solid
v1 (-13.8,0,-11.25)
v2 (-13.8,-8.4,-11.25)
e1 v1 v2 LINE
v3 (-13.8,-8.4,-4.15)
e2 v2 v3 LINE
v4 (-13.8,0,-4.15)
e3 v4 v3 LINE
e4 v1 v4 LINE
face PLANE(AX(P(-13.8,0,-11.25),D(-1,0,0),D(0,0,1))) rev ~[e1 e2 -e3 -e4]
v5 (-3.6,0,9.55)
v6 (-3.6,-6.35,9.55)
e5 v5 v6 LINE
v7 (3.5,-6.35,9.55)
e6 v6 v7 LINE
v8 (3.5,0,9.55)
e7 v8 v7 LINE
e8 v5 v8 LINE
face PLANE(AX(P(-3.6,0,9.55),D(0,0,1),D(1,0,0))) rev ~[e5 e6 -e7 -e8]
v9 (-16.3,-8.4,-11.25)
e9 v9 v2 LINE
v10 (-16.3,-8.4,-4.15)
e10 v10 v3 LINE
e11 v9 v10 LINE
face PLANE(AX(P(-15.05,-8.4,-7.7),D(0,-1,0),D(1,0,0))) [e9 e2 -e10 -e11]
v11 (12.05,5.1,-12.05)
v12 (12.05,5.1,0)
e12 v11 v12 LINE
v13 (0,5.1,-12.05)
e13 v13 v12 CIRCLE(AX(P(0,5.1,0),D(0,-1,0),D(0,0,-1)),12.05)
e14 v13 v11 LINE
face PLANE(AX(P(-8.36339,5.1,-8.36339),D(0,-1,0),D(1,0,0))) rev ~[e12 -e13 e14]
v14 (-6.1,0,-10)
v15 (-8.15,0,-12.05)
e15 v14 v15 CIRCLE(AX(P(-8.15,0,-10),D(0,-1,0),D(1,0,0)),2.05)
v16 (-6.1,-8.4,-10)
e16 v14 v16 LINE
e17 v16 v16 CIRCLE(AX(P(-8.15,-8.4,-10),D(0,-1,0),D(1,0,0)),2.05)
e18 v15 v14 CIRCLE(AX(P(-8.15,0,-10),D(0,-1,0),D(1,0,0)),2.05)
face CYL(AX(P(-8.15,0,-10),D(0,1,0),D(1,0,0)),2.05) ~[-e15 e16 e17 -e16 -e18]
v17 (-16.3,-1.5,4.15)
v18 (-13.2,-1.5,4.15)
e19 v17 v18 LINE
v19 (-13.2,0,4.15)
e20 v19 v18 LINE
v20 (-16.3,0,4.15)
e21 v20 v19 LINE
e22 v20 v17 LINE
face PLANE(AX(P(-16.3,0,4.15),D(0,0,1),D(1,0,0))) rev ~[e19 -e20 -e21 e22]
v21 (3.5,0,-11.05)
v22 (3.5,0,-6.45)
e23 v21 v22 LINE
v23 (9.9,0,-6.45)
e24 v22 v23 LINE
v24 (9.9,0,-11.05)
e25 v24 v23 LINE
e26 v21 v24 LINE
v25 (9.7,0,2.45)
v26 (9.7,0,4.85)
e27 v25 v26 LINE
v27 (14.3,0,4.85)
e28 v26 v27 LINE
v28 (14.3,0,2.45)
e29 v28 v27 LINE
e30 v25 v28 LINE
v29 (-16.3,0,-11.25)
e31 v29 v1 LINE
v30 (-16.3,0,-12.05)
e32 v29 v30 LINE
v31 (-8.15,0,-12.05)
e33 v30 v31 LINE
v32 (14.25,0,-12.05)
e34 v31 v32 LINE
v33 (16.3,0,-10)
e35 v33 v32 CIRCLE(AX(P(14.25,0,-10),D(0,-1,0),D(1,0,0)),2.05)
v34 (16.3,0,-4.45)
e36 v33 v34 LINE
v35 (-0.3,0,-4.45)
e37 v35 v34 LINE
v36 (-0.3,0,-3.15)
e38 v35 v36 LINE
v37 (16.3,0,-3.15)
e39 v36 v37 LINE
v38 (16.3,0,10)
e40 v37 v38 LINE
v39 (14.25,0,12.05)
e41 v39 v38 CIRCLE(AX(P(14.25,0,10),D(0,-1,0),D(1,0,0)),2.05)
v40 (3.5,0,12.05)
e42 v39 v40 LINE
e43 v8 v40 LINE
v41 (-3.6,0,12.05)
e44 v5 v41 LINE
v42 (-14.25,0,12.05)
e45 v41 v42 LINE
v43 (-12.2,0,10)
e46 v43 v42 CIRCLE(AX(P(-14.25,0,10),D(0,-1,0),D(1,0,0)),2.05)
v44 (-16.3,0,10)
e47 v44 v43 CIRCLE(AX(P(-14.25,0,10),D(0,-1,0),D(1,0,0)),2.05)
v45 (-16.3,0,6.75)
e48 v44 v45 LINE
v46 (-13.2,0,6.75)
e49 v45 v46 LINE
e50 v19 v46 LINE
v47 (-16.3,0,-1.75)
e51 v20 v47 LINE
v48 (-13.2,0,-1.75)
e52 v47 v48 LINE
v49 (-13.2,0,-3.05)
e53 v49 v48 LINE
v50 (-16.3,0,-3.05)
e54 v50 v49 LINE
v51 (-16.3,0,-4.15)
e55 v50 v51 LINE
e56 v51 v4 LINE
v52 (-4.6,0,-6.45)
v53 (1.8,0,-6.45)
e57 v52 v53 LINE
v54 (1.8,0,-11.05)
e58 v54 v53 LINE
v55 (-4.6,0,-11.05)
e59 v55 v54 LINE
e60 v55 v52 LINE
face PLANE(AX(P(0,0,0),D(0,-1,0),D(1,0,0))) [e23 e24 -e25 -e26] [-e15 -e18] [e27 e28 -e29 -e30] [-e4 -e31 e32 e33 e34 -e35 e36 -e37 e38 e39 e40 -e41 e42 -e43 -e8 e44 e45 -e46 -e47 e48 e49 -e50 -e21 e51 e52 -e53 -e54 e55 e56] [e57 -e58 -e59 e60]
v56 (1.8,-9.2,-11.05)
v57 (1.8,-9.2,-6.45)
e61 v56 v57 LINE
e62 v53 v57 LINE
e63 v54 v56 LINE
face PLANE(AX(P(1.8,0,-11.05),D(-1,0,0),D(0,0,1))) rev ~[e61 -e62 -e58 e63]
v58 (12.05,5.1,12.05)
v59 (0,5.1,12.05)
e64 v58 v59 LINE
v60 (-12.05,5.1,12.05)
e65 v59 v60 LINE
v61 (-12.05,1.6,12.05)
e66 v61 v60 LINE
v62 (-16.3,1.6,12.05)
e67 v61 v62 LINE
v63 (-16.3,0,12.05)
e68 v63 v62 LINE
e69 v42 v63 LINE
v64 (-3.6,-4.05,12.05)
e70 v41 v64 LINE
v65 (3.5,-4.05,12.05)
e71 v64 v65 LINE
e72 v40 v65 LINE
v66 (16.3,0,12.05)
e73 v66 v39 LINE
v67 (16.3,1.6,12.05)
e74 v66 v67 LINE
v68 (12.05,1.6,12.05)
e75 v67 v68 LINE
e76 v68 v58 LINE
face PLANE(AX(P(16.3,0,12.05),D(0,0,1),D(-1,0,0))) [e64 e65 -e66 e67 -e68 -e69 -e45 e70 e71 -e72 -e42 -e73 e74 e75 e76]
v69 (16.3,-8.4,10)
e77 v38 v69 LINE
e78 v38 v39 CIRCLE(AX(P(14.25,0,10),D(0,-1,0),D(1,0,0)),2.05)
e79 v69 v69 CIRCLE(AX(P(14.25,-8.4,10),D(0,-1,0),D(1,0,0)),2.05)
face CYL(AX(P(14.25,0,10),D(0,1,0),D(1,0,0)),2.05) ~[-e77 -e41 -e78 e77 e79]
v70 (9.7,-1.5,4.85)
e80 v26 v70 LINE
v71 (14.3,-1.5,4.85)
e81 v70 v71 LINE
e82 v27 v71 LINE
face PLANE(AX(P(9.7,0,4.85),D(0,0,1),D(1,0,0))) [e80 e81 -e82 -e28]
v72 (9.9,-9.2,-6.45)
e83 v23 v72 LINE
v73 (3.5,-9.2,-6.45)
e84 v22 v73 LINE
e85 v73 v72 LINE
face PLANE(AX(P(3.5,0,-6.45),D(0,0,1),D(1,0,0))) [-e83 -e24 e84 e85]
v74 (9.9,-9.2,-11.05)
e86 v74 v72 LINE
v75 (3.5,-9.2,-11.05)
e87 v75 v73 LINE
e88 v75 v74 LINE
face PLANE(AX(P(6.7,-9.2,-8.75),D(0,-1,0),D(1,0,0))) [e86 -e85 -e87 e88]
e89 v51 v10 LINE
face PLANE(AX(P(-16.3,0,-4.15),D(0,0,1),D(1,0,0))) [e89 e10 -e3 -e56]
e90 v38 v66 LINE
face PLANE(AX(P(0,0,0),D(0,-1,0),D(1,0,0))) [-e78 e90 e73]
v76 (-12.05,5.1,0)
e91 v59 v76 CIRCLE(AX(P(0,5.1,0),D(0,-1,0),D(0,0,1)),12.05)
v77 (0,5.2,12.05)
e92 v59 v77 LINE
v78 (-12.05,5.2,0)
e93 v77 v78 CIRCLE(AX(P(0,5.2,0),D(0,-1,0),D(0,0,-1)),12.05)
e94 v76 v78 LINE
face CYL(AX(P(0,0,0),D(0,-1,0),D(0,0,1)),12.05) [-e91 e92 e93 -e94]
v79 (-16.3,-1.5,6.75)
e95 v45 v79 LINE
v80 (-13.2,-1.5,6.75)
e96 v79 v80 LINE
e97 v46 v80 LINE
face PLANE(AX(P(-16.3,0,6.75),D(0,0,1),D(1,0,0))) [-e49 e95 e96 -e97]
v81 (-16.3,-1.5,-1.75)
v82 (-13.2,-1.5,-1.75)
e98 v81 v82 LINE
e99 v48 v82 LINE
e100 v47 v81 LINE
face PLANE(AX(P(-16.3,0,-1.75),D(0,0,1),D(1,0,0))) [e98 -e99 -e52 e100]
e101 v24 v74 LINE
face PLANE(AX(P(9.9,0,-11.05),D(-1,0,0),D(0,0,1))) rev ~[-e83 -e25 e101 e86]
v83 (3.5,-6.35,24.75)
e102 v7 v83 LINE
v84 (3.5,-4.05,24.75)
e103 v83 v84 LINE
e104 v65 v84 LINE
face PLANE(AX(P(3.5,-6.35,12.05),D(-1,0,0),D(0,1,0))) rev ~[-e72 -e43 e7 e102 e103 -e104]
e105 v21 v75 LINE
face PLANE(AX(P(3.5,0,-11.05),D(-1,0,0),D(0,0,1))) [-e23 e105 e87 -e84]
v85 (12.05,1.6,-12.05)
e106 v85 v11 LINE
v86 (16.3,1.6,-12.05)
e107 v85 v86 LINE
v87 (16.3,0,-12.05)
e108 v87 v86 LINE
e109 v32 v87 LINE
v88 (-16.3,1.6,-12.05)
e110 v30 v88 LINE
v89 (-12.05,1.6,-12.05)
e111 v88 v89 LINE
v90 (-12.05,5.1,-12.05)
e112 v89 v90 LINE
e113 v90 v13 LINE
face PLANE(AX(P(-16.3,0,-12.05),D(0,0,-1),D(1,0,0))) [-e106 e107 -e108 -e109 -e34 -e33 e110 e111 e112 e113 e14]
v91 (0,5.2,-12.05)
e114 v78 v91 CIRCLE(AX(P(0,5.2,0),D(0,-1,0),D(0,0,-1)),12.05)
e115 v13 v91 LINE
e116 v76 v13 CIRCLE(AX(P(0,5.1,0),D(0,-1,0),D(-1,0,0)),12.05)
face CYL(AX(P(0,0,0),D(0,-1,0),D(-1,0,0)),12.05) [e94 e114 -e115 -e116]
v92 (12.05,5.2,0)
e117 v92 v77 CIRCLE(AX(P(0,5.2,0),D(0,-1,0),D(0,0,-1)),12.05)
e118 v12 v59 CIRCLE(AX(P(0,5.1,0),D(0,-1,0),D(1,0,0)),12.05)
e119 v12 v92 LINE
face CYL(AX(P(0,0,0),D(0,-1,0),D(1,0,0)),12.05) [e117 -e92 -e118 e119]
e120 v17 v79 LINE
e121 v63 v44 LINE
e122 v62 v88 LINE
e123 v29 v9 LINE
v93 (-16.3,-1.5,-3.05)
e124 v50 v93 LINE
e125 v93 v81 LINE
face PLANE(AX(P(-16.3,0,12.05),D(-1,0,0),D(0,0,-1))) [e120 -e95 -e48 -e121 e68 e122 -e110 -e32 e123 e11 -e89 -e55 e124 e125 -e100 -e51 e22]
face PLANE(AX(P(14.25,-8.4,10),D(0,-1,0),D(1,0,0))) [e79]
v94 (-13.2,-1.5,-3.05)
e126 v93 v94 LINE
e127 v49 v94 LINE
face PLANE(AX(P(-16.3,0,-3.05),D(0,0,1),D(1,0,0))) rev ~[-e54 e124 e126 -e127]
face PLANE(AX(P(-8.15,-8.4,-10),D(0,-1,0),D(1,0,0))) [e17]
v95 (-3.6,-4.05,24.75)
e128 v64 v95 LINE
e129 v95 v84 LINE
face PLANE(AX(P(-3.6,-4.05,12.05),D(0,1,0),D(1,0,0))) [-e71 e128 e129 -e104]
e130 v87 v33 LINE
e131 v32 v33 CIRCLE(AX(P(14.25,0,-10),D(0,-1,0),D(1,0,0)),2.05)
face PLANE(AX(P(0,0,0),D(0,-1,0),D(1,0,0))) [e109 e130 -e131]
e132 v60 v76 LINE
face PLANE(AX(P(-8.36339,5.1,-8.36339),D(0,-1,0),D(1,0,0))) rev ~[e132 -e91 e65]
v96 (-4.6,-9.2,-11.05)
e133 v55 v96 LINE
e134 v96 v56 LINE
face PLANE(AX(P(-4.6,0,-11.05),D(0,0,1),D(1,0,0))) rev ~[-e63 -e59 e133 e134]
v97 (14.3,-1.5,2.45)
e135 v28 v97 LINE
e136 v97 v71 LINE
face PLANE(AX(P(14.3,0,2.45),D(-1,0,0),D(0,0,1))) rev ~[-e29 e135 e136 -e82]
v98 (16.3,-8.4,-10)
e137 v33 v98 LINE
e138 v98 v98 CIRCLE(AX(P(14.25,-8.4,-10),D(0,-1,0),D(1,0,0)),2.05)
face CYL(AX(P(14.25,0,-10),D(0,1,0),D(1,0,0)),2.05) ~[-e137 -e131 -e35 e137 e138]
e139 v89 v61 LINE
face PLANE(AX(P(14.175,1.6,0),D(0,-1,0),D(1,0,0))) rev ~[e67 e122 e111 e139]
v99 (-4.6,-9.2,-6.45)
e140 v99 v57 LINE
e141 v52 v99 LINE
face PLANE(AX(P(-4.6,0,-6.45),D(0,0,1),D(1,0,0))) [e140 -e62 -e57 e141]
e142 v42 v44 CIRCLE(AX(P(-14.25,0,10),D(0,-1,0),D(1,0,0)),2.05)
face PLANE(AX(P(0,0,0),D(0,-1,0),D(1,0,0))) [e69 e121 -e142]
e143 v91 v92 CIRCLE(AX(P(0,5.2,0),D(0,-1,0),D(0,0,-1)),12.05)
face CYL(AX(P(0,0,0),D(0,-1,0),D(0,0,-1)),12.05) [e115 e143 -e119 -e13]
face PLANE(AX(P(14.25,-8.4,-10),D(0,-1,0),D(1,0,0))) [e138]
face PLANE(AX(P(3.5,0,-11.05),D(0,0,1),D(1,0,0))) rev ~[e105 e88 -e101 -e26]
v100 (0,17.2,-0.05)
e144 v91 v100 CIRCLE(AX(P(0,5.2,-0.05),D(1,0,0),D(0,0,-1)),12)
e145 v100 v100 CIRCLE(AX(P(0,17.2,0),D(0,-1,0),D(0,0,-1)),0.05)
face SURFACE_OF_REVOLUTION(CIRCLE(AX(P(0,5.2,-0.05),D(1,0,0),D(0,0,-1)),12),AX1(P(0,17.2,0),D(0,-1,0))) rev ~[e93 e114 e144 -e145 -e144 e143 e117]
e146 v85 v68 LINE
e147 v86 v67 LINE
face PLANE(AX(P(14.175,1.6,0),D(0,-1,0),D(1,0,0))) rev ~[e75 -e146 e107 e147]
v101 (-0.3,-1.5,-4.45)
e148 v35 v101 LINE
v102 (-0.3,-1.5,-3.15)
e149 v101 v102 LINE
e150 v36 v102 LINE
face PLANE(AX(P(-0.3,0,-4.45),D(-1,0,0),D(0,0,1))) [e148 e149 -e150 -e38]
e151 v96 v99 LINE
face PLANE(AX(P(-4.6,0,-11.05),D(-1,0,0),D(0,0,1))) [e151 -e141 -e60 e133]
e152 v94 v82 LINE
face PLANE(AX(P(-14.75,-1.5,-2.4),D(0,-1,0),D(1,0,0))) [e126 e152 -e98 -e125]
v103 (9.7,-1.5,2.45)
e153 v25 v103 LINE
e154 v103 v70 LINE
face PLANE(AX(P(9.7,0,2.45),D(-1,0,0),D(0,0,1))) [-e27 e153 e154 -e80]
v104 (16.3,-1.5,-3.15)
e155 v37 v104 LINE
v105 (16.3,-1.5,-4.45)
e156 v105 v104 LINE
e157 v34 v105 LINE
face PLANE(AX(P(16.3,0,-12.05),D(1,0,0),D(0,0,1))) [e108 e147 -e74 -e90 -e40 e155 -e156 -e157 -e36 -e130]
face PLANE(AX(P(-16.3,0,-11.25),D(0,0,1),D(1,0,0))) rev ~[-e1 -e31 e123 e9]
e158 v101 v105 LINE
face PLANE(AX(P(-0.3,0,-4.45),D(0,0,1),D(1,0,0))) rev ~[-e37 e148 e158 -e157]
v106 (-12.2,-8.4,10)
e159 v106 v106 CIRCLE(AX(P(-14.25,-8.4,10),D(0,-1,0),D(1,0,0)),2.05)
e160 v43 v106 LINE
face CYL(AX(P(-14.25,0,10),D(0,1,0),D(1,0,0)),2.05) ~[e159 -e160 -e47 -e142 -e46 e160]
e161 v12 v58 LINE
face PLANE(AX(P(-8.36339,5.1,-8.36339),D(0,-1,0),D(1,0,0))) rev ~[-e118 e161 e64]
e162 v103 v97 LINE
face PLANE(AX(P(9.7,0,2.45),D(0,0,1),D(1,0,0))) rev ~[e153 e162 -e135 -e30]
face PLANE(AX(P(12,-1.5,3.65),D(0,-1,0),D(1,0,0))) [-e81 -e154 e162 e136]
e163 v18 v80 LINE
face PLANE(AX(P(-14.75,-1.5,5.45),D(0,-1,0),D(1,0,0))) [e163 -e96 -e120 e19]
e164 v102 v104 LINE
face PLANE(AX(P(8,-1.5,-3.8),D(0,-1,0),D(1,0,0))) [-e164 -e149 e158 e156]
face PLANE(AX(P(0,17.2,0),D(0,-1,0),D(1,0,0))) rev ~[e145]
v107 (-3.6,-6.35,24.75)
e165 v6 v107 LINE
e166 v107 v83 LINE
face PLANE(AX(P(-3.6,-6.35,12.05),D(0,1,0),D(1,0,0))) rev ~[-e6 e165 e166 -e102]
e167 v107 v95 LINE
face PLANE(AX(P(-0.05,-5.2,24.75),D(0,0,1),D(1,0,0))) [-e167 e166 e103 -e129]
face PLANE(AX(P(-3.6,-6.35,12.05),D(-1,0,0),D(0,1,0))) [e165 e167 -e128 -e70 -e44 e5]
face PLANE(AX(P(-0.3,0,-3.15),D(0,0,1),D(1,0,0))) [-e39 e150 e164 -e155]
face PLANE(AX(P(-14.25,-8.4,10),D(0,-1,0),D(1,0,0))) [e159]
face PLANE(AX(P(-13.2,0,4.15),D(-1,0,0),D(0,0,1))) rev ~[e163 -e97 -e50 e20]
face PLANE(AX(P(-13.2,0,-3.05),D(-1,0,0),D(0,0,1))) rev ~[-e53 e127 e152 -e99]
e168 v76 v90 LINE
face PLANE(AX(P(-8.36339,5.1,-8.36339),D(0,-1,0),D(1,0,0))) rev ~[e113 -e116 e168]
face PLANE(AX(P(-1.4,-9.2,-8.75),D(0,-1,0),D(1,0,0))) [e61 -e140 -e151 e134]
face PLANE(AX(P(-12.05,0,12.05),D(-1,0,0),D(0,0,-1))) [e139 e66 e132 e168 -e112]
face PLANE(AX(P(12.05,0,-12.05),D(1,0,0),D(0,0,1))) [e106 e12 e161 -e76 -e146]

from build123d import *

# Parameters (mm, degrees)
F2_DEPTH  = 1.6
F3_DEPTH  = 5.1
F4_DEPTH  = 17.2
F1_R      = 2.05
F1_W      = 2.5
F1_H      = 7.1
F6_DEPTH  = 8.4
F1_W_2    = 6.4
F1_H_2    = 4.6
F7_DEPTH  = 9.2
F1_W_3    = 3.1
F1_H_3    = 1.3
F1_W_4    = 4.6
F1_H_4    = 2.4
F1_W_5    = 16.6
F1_H_5    = 2.6
F8_DEPTH  = 1.5
F1_W_6    = 7.1
F1_H_6    = 2.5
F9_DEPTH  = 6.35
F10_W     = 7.1
F10_H     = 2.3
F11_DEPTH = 12.7


# Not quite as in the source:
# - a fillet or chamfer that OpenCascade refuses, or shapes differently, is made with other operations: its cross-section is extruded or revolved along the edge and cut away or added


with BuildPart() as f2:
    # F0 (on Front) → F2 (new body)
    with BuildSketch(Plane.XZ):
        Polygon((16.3, -12.05), (16.3, 12.05), (12.05, 12.05), (12.05, 0), (12.05, -12.05), align=None)
        with BuildLine():
            Line((12.05, 0), (12.05, 12.05))
            Line((12.05, 12.05), (0, 12.05))
            ThreePointArc((0, 12.05), (8.5206367133, 8.5206367133), (12.05, 0))
        make_face()
        with BuildLine():
            ThreePointArc((-12.05, 0), (-8.5206367133, 8.5206367133), (0, 12.05))
            Line((0, 12.05), (-12.05, 12.05))
            Line((-12.05, 12.05), (-12.05, 0))
        make_face()
        with BuildLine():
            ThreePointArc((12.05, 0), (8.5206367133, 8.5206367133), (0, 12.05))
            ThreePointArc((0, 12.05), (-8.5206367133, 8.5206367133), (-12.05, 0))
            ThreePointArc((-12.05, 0), (-8.5206367125, -8.5206367141), (2.1e-09, -12.05))
            ThreePointArc((2.1e-09, -12.05), (8.5206367141, -8.5206367125), (12.05, 0))
        make_face()
        with BuildLine():
            Line((12.05, -12.05), (12.05, 0))
            ThreePointArc((12.05, 0), (8.5206367141, -8.5206367125), (2.1e-09, -12.05))
            Line((2.1e-09, -12.05), (12.05, -12.05))
        make_face()
        Polygon((-12.05, 0), (-12.05, 12.05), (-16.3, 12.05), (-16.3, -12.05), (-12.05, -12.05), align=None)
        with BuildLine():
            ThreePointArc((2.1e-09, -12.05), (-8.5206367125, -8.5206367141), (-12.05, 0))
            Line((-12.05, 0), (-12.05, -12.05))
            Line((-12.05, -12.05), (2.1e-09, -12.05))
        make_face()
    extrude(amount=-F2_DEPTH)

    # F0 (on Front) → F3 (join)
    with BuildSketch(Plane.XZ):
        with BuildLine():
            ThreePointArc((2.1e-09, -12.05), (-8.5206367125, -8.5206367141), (-12.05, 0))
            Line((-12.05, 0), (-12.05, -12.05))
            Line((-12.05, -12.05), (2.1e-09, -12.05))
        make_face()
        with BuildLine():
            ThreePointArc((-12.05, 0), (-8.5206367133, 8.5206367133), (0, 12.05))
            Line((0, 12.05), (-12.05, 12.05))
            Line((-12.05, 12.05), (-12.05, 0))
        make_face()
        with BuildLine():
            ThreePointArc((12.05, 0), (8.5206367133, 8.5206367133), (0, 12.05))
            ThreePointArc((0, 12.05), (-8.5206367133, 8.5206367133), (-12.05, 0))
            ThreePointArc((-12.05, 0), (-8.5206367125, -8.5206367141), (2.1e-09, -12.05))
            ThreePointArc((2.1e-09, -12.05), (8.5206367141, -8.5206367125), (12.05, 0))
        make_face()
        with BuildLine():
            Line((12.05, 0), (12.05, 12.05))
            Line((12.05, 12.05), (0, 12.05))
            ThreePointArc((0, 12.05), (8.5206367133, 8.5206367133), (12.05, 0))
        make_face()
        with BuildLine():
            Line((12.05, -12.05), (12.05, 0))
            ThreePointArc((12.05, 0), (8.5206367141, -8.5206367125), (2.1e-09, -12.05))
            Line((2.1e-09, -12.05), (12.05, -12.05))
        make_face()
    extrude(amount=-F3_DEPTH)

    # F0 (on Front) → F4 (join)
    with BuildSketch(Plane.XZ):
        with BuildLine():
            ThreePointArc((12.05, 0), (8.5206367133, 8.5206367133), (0, 12.05))
            ThreePointArc((0, 12.05), (-8.5206367133, 8.5206367133), (-12.05, 0))
            ThreePointArc((-12.05, 0), (-8.5206367125, -8.5206367141), (2.1e-09, -12.05))
            ThreePointArc((2.1e-09, -12.05), (8.5206367141, -8.5206367125), (12.05, 0))
        make_face()
    extrude(amount=-F4_DEPTH)

    # F5: fillet of radius 12 on 1 edges, made by hand

    # F5_s1 → F5_t2 (revolve, cut)
    with BuildSketch(Plane.YZ):
        with BuildLine():
            ThreePointArc((5.2, -12.05), (13.6852813742, -8.5352813742), (17.2, -0.05))
            Line((17.2, -0.05), (17.2, -12.05))
            Line((17.2, -12.05), (5.2, -12.05))
        make_face()
    revolve(axis=Axis((0, 17.2, 0), (0, -1, 0)), mode=Mode.SUBTRACT)

    # F1 (on Front) → F6 (join)
    with BuildSketch(Plane.XZ):
        with Locations((-14.25, 10)):
            Circle(F1_R)
        with Locations((14.25, 10)):
            Circle(F1_R)
        with Locations((14.25, -10)):
            Circle(F1_R)
        with Locations((-8.15, -10)):
            Circle(F1_R)
        with Locations((-15.05, -7.7)):
            Rectangle(F1_W, F1_H)
    extrude(amount=F6_DEPTH)

    # F1 (on Front) → F7 (join)
    with BuildSketch(Plane.XZ):
        with Locations((-1.4, -8.75)):
            Rectangle(F1_W_2, F1_H_2)
        with Locations((6.7, -8.75)):
            Rectangle(F1_W_2, F1_H_2)
    extrude(amount=F7_DEPTH)

    # F1 (on Front) → F8 (join)
    with BuildSketch(Plane.XZ):
        with Locations((-14.75, -2.4)):
            Rectangle(F1_W_3, F1_H_3)
        with Locations((12, 3.65)):
            Rectangle(F1_W_4, F1_H_4)
        with Locations((8, -3.8)):
            Rectangle(F1_W_5, F1_H_3)
        with Locations((-14.75, 5.45)):
            Rectangle(F1_W_3, F1_H_5)
    extrude(amount=F8_DEPTH)

    # F1 (on Front) → F9 (join)
    with BuildSketch(Plane.XZ):
        with Locations((-0.05, 10.8)):
            Rectangle(F1_W_6, F1_H_6)
    extrude(amount=F9_DEPTH)

    # F10 (on face) → F11 (join)
    with BuildSketch(Plane.XY.offset(12.05)):
        with Locations((-0.05, -5.2)):
            Rectangle(F10_W, F10_H)
    extrude(amount=F11_DEPTH)


solid = f2.part
